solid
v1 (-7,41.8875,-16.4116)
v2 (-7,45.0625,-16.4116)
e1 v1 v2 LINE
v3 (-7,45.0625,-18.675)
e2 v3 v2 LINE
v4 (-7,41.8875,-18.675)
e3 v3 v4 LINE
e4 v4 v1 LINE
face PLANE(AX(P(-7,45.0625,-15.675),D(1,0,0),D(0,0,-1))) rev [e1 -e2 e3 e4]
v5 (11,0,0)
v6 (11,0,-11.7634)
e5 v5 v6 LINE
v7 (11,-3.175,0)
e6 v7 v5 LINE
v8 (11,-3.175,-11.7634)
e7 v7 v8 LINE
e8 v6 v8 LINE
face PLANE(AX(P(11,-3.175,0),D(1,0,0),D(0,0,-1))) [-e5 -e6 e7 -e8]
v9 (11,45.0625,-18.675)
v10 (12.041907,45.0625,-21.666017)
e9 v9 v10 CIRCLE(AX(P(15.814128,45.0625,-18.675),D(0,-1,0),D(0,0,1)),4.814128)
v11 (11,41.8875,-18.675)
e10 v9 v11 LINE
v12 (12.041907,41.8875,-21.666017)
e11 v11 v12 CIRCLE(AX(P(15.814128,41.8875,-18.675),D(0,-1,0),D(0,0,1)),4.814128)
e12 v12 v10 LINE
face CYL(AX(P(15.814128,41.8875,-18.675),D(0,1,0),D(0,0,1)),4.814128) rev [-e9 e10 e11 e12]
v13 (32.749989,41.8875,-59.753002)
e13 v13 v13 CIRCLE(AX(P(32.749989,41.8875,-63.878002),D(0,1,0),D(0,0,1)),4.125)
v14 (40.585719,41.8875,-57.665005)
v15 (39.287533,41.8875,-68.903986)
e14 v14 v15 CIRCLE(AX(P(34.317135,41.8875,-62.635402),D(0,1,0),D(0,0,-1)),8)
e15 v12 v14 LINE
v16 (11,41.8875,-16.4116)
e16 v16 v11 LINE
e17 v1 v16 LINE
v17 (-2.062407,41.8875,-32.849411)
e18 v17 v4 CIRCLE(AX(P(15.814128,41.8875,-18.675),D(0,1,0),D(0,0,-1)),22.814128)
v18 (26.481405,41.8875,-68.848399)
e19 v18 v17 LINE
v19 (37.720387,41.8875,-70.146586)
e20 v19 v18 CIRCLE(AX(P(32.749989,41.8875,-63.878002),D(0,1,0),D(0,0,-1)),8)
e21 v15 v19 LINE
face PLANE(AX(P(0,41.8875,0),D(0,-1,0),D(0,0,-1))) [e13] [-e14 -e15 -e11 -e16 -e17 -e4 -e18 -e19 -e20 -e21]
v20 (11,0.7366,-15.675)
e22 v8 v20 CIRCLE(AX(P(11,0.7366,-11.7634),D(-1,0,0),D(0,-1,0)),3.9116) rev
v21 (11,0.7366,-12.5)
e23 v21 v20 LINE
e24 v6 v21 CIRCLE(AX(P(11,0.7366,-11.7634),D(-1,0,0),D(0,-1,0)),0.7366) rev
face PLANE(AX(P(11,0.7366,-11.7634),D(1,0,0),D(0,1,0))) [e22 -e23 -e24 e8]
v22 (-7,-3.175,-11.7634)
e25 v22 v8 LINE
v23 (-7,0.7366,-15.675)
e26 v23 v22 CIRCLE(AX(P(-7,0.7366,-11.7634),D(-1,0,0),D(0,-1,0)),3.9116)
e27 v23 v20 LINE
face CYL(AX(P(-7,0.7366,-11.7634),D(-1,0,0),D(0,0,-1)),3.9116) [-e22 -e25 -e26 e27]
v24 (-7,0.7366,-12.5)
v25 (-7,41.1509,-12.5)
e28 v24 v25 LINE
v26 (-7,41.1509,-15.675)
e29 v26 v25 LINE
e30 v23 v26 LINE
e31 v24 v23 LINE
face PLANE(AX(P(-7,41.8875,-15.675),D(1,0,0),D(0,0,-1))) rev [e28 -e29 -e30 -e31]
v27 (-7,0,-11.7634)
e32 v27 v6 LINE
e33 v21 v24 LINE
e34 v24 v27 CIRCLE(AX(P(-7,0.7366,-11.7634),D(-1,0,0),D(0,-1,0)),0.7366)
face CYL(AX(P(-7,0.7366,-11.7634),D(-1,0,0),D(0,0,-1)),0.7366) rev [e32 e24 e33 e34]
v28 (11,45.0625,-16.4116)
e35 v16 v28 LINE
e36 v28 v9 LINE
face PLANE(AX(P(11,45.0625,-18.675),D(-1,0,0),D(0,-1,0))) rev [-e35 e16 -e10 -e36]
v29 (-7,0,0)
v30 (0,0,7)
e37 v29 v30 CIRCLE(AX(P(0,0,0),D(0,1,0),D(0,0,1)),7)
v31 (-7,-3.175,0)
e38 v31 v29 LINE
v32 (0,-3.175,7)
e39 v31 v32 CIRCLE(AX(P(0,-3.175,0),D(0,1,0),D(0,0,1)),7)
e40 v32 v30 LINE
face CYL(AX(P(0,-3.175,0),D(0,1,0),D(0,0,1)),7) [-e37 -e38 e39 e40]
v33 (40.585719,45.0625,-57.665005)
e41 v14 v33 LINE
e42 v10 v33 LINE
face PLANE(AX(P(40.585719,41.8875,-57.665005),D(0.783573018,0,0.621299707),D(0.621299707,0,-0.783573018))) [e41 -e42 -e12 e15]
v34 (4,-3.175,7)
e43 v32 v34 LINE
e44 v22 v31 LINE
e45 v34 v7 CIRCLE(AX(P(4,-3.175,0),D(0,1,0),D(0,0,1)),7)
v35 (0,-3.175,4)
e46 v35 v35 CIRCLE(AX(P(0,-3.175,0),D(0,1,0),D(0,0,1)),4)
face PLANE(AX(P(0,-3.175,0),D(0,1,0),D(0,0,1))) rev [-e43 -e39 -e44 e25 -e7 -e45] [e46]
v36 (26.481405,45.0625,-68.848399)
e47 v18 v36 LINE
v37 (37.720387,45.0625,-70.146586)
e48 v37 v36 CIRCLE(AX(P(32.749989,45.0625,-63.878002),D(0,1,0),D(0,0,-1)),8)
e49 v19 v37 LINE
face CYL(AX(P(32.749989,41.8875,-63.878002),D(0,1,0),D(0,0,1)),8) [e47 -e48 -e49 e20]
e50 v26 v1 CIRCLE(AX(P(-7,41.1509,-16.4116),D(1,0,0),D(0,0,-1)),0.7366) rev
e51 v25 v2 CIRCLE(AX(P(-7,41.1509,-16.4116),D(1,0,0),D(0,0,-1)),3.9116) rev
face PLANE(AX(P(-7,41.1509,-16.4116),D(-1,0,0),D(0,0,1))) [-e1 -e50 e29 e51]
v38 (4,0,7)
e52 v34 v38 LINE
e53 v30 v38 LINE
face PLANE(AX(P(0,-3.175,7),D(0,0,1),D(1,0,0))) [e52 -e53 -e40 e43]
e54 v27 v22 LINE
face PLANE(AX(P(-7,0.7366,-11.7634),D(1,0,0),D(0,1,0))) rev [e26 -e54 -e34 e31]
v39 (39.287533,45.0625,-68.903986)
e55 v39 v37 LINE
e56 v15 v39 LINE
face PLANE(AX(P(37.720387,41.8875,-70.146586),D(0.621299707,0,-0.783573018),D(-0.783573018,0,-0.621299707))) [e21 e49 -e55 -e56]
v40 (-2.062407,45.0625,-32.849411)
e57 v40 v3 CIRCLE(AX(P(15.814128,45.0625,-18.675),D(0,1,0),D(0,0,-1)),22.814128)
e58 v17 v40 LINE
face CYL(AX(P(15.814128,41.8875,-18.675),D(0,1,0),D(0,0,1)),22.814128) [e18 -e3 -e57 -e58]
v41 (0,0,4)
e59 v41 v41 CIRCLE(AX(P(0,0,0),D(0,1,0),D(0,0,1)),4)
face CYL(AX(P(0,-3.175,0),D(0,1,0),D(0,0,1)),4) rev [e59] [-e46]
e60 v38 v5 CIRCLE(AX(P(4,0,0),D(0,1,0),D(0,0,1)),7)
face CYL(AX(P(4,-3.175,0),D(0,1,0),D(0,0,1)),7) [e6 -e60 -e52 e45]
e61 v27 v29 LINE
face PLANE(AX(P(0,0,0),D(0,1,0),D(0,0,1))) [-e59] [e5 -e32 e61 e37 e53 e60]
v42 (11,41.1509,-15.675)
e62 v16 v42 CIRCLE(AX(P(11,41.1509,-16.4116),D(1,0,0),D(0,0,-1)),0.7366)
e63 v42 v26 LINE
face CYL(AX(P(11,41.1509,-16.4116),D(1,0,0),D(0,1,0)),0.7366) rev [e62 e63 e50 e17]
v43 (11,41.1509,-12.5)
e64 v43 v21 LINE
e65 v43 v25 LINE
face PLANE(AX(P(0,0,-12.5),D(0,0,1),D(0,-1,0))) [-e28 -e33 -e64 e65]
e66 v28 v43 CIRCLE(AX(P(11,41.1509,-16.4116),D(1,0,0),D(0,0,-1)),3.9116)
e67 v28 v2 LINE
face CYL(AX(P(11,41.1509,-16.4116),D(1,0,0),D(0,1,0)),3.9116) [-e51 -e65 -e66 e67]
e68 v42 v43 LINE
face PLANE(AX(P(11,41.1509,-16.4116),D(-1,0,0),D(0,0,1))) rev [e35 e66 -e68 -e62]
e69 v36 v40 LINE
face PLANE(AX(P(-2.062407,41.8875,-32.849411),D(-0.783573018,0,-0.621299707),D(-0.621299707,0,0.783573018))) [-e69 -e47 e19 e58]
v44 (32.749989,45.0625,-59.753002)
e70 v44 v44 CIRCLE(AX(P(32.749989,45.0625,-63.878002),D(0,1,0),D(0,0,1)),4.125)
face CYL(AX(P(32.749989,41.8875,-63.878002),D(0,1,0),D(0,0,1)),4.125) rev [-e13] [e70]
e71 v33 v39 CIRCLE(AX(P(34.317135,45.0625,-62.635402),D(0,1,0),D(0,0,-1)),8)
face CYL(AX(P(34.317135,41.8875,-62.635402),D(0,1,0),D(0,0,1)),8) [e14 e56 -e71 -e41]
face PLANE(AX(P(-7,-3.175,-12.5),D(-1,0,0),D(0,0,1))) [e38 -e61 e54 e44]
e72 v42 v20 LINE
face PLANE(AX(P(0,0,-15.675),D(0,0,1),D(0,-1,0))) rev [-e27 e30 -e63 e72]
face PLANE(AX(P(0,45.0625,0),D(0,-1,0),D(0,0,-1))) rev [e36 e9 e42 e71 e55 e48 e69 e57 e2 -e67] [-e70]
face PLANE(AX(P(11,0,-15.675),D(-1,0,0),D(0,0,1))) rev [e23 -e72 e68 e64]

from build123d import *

# Parameters (mm, degrees)
SKETCH1_R                    = 4
BASE_FLANGE1_DEPTH           = 3.175
EDGE_FLANGE1_STRIP_W         = 14.1732
EDGE_FLANGE1_STRIP_H         = 3.175
EDGE_FLANGE1_STRIP_CUT_DEPTH = 18
EDGE_FLANGE1_DEPTH           = 18
EDGE_FLANGE2_STRIP_W         = 14.1732
EDGE_FLANGE2_STRIP_H         = 3.175
EDGE_FLANGE2_STRIP_CUT_DEPTH = 18
EDGE_FLANGE2_DEPTH           = 18
SKETCH12_R                   = 4.125
BOSS_EXTRUDE1_DEPTH          = 3.175


# Sheet-metal steps are written as plain solids
with BuildPart() as part:
    # Sketch1 → Base-Flange1 (new body)
    with BuildSketch(Plane(origin=(0, 0, 0), x_dir=(1, 0, 0), z_dir=(0, 1, 0))):
        with BuildLine():
            Line((-7, 12.5), (-7, 0))
            ThreePointArc((-7, 0), (-4.949747468, -4.949747468), (0, -7))
            Line((0, -7), (4, -7))
            ThreePointArc((4, -7), (8.949747468, -4.949747468), (11, 0))
            Line((11, 0), (11, 12.5))
            Line((11, 12.5), (-7, 12.5))
        make_face()
        with Locations(Location((0, 0, 0), (0, 0, 270))):
            Circle(SKETCH1_R, mode=Mode.SUBTRACT)
    extrude(amount=-BASE_FLANGE1_DEPTH)

    # Edge-Flange1 strip (across the edge) → Edge-Flange1 strip cut (cut)
    with BuildSketch(Plane(origin=(11, 0, -12.5), x_dir=(0, 0, 1), z_dir=(-1, 0, 0))):
        with Locations((-6.35, -1.5875)):
            Rectangle(EDGE_FLANGE1_STRIP_W, EDGE_FLANGE1_STRIP_H)
    extrude(amount=EDGE_FLANGE1_STRIP_CUT_DEPTH, mode=Mode.SUBTRACT)

    # Edge-Flange1 section (across the edge) → Edge-Flange1 (add)
    with BuildSketch(Plane(origin=(11, 0, -12.5), x_dir=(0, 0, 1), z_dir=(-1, 0, 0))):
        with BuildLine():
            Line((-3.175, 0.7366), (-3.175, 41.8875))
            Line((-3.175, 41.8875), (0, 41.8875))
            Line((0, 41.8875), (0, 0.7366))
            ThreePointArc((0, 0.7366), (0.215745145, 0.215745145), (0.7366, 0))
            Line((0.7366, 0), (0.7366, -3.175))
            ThreePointArc((0.7366, -3.175), (-2.029318885, -2.029318885), (-3.175, 0.7366))
        make_face()
    extrude(amount=EDGE_FLANGE1_DEPTH)

    # Edge-Flange2 strip (across the edge) → Edge-Flange2 strip cut (cut)
    with BuildSketch(Plane(origin=(-7, 41.8875, -15.675), x_dir=(0, -1, 0), z_dir=(1, 0, 0))):
        with Locations((-6.35, -1.5875)):
            Rectangle(EDGE_FLANGE2_STRIP_W, EDGE_FLANGE2_STRIP_H)
    extrude(amount=EDGE_FLANGE2_STRIP_CUT_DEPTH, mode=Mode.SUBTRACT)

    # Edge-Flange2 section (across the edge) → Edge-Flange2 (add)
    with BuildSketch(Plane(origin=(-7, 41.8875, -15.675), x_dir=(0, -1, 0), z_dir=(1, 0, 0))):
        with BuildLine():
            Line((-3.175, 0.7366), (-3.175, 3))
            Line((-3.175, 3), (0, 3))
            Line((0, 3), (0, 0.7366))
            ThreePointArc((0, 0.7366), (0.215745145, 0.215745145), (0.7366, 0))
            Line((0.7366, 0), (0.7366, -3.175))
            ThreePointArc((0.7366, -3.175), (-2.029318885, -2.029318885), (-3.175, 0.7366))
        make_face()
    extrude(amount=EDGE_FLANGE2_DEPTH)

    # Sketch12 → Boss-Extrude1 (add)
    with BuildSketch(Plane(origin=(0, 45.0625, 0), x_dir=(1, 0, 0), z_dir=(0, 1, 0))):
        with BuildLine():
            Line((11, 18.675), (-7, 18.675))
            ThreePointArc((-7, 18.675), (-5.730267968, 26.179894377), (-2.062407049, 32.849411251))
            Line((-2.062407049, 32.849411251), (26.4814048, 68.848399382))
            ThreePointArc((26.4814048, 68.848399382), (31.832032475, 71.825161968), (37.720386598, 70.146585866))
            Line((37.720386598, 70.146585866), (39.287532633, 68.903986451))
            ThreePointArc((39.287532633, 68.903986451), (42.264295219, 63.553358776), (40.585719117, 57.665004653))
            Line((40.585719117, 57.665004653), (12.041907268, 21.666016522))
            ThreePointArc((12.041907268, 21.666016522), (11.267932785, 20.258646945), (11, 18.675))
        make_face()
        with Locations(Location((32.749988941, 63.878001725, 0), (0, 0, 270))):
            Circle(SKETCH12_R, mode=Mode.SUBTRACT)
    extrude(amount=-BOSS_EXTRUDE1_DEPTH)


solid = part.part
